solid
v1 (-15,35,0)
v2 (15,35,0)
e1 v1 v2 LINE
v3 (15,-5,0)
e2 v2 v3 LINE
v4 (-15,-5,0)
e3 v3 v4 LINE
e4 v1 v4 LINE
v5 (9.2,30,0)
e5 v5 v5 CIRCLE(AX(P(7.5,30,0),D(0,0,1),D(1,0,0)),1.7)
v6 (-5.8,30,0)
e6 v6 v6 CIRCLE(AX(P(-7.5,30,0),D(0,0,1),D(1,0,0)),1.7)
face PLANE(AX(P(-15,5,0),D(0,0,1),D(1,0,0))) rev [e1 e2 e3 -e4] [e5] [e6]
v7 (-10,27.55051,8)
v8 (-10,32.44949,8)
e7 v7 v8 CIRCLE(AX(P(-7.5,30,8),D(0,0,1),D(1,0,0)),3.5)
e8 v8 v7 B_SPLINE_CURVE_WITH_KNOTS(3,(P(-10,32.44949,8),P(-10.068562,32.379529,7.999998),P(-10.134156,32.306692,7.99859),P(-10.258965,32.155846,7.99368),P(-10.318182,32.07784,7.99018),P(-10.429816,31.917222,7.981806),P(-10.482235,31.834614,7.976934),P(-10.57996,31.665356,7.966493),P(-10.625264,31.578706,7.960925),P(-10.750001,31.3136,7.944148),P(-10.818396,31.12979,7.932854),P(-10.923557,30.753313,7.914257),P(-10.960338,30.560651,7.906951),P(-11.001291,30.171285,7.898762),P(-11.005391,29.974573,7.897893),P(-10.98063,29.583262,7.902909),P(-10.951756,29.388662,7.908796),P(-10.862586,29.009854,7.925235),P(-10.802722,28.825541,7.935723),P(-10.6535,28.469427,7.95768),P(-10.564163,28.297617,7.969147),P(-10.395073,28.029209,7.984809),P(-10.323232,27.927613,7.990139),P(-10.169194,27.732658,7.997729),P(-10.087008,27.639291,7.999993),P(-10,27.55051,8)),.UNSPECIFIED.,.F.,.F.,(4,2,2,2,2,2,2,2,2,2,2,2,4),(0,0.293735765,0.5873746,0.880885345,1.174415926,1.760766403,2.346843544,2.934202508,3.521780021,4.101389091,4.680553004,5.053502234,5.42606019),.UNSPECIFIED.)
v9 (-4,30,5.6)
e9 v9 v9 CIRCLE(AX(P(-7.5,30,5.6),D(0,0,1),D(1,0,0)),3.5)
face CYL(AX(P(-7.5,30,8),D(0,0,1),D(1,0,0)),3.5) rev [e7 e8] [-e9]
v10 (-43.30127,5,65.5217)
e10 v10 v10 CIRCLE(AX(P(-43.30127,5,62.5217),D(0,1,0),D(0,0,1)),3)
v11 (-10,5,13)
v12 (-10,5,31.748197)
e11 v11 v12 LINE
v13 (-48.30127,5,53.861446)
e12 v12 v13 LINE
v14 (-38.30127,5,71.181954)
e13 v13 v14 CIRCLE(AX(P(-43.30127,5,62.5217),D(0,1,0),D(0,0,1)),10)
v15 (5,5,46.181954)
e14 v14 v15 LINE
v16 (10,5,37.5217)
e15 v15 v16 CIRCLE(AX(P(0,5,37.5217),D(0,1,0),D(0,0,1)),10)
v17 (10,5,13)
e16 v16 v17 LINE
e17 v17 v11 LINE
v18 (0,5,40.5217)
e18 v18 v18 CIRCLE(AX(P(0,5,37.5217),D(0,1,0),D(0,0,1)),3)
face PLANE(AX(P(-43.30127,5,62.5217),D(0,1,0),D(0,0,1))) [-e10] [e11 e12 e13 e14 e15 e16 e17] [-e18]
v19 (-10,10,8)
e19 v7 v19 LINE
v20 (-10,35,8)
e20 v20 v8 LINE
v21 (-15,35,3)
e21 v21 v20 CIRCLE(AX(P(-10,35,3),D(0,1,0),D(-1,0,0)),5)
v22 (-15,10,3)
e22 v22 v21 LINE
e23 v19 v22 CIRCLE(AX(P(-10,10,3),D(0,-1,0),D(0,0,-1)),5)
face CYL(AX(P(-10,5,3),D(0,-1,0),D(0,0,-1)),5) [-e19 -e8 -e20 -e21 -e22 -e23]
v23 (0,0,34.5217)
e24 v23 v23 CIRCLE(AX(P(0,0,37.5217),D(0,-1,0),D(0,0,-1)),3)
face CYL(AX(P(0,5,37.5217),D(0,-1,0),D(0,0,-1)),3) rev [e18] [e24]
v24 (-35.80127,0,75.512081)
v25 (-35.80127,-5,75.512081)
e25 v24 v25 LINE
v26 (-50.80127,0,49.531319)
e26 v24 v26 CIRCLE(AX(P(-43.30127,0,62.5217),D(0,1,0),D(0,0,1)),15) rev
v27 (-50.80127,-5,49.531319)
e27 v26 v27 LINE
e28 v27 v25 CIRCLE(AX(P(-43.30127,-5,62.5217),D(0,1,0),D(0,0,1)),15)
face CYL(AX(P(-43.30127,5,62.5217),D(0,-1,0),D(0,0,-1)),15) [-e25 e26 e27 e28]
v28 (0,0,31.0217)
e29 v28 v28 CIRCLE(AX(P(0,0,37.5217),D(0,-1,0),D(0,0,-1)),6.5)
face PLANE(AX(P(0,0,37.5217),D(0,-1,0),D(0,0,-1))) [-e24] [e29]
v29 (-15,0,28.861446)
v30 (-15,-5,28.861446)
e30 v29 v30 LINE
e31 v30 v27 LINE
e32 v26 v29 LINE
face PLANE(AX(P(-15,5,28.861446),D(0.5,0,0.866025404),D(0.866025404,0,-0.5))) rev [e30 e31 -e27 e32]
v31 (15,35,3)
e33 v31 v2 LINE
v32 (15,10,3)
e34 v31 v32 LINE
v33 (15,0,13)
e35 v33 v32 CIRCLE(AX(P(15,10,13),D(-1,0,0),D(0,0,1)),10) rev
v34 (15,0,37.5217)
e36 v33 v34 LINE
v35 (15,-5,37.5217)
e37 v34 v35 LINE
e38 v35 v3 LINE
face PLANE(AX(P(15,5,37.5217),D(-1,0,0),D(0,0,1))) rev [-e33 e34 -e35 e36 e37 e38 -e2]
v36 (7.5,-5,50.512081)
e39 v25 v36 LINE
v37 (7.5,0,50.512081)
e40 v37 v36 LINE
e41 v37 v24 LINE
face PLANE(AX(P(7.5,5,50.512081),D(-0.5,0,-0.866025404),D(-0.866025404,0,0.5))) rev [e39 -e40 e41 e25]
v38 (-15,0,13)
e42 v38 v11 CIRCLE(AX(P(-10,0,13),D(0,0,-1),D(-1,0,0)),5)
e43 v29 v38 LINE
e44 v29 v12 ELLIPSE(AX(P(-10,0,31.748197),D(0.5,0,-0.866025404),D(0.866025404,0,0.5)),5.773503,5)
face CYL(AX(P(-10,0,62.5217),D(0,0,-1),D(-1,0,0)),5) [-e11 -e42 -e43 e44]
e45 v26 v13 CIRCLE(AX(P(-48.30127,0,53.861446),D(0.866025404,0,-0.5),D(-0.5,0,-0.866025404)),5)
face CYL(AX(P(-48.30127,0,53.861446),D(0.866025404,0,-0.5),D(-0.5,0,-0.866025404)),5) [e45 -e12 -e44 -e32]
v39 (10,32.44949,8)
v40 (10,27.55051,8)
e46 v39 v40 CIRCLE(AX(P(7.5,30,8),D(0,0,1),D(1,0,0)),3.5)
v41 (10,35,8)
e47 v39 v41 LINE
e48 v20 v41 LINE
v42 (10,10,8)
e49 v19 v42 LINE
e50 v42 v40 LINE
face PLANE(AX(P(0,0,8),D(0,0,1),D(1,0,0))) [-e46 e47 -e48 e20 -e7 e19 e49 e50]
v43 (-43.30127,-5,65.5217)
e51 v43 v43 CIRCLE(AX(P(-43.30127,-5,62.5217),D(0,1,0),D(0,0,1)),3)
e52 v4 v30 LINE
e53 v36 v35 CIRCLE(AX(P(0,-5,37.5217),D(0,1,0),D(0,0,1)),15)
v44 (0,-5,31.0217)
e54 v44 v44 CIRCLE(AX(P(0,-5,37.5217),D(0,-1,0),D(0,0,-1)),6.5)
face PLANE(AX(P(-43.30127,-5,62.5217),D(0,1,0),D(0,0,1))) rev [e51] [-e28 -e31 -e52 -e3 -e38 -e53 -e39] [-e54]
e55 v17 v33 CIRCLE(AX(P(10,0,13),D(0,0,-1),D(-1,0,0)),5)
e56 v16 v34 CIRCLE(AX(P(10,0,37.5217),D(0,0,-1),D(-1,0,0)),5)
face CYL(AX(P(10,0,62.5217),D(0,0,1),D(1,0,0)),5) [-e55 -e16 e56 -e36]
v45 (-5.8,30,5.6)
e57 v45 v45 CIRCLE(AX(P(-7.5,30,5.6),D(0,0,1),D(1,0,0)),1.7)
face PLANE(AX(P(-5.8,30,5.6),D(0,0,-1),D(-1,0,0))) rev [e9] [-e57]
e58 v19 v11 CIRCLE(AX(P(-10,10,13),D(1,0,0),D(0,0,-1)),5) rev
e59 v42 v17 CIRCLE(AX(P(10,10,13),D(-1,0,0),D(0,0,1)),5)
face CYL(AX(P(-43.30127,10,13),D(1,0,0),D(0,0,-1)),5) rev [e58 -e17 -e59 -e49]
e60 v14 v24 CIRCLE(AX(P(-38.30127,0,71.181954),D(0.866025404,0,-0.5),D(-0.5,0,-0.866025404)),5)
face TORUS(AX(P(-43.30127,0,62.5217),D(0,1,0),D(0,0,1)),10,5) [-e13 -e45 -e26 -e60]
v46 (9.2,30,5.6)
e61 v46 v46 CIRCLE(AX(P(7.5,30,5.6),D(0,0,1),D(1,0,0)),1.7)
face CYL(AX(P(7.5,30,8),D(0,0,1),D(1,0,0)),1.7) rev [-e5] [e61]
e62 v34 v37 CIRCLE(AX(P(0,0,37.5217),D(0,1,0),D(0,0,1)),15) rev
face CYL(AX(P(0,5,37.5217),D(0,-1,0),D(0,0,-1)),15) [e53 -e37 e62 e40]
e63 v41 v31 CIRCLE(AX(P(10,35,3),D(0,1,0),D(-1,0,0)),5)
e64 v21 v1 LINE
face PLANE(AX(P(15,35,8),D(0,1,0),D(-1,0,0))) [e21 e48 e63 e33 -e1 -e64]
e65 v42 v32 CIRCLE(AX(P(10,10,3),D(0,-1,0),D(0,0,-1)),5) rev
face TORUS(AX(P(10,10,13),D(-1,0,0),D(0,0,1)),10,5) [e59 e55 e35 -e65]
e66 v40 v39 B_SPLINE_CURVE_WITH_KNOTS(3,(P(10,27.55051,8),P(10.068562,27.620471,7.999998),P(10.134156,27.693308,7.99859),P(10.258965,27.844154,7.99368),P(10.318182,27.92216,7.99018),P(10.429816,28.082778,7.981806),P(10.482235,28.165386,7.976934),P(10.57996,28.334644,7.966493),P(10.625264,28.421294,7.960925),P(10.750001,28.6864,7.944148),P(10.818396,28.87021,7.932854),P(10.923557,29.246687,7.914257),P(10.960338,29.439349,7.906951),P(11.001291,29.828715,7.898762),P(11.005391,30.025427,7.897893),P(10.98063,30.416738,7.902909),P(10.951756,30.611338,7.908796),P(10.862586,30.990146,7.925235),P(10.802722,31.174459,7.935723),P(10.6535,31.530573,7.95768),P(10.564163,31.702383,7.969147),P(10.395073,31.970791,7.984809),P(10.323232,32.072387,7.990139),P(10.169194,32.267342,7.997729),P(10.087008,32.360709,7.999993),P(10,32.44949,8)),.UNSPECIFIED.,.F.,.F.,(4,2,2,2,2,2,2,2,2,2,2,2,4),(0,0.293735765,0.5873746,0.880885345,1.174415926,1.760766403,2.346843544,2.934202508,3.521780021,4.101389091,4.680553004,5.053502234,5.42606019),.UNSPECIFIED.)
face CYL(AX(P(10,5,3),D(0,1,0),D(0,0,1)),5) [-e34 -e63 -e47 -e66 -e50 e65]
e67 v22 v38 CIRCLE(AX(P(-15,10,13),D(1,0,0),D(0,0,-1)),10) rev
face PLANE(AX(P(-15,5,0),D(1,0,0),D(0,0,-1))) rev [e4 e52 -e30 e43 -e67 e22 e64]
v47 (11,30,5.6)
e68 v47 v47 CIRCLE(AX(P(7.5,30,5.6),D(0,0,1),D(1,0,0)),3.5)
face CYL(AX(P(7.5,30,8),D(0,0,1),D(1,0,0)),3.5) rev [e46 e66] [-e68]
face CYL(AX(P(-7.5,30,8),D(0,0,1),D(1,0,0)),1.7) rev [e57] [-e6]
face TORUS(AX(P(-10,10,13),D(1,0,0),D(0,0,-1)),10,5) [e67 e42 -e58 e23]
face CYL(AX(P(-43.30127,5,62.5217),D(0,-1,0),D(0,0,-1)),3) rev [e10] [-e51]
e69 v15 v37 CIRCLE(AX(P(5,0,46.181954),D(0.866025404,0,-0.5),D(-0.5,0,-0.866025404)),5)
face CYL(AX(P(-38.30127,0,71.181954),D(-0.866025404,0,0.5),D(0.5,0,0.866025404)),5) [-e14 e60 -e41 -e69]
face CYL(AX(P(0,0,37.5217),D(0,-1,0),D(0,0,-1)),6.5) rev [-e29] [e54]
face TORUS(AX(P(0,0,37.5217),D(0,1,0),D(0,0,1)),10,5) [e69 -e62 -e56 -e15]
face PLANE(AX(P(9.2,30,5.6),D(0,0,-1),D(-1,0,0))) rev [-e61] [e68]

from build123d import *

# Parameters (mm, degrees)
CROQUIS1_R                                           = 3
SALIENTE_EXTRUIR1_DEPTH                              = 5
CROQUIS2_W                                           = 30
CROQUIS2_H                                           = 30
SALIENTE_EXTRUIR2_DEPTH                              = 8
REFRENTADO_PARA_TORNILLO_CON_CABEZA_TRON_D           = 3.4
REFRENTADO_PARA_TORNILLO_CON_CABEZA_TRON_CBORE_D     = 7
REFRENTADO_PARA_TORNILLO_CON_CABEZA_TRON_CBORE_DEPTH = 2.4
CROQUIS11_R                                          = 6.5
CORTAR_EXTRUIR3_DEPTH                                = 5
REDONDEO8_R                                          = 5


with BuildPart() as part:
    # Croquis1 → Saliente-Extruir1 (new, symmetric)
    with BuildSketch(Plane(origin=(0, 0, 0), x_dir=(-1, 0, 0), z_dir=(0, 1, 0))):
        with BuildLine():
            Line((15, 0), (-15, 0))
            Line((-15, 0), (-15, 37.5217))
            ThreePointArc((-15, 37.5217), (-12.990381057, 45.0217), (-7.5, 50.512081057))
            Line((-7.5, 50.512081057), (35.801270189, 75.512081057))
            ThreePointArc((35.801270189, 75.512081057), (56.291651246, 70.0217), (50.801270189, 49.531318943))
            Line((50.801270189, 49.531318943), (15, 28.861445962))
            Line((15, 28.861445962), (15, 0))
        make_face()
        with Locations(Location((0, 37.5217, 0), (0, 0, 90))):
            Circle(CROQUIS1_R, mode=Mode.SUBTRACT)
        with Locations(Location((43.301270189, 62.5217, 0), (0, 0, 90))):
            Circle(CROQUIS1_R, mode=Mode.SUBTRACT)
    extrude(amount=SALIENTE_EXTRUIR1_DEPTH, both=True)

    # Croquis2 → Saliente-Extruir2 (add)
    with BuildSketch(Plane(origin=(0, 0, 0), x_dir=(1, 0, 0), z_dir=(0, 0, -1))):
        with Locations((0, -20)):
            Rectangle(CROQUIS2_W, CROQUIS2_H)
    extrude(amount=-SALIENTE_EXTRUIR2_DEPTH)

    # Refrentado para tornillo con cabeza troncocónica de M31 (through all)
    with Locations(Plane.XY.offset(8)):
        with Locations((-7.5, 30), (7.5, 30)):
            CounterBoreHole(REFRENTADO_PARA_TORNILLO_CON_CABEZA_TRON_D / 2, REFRENTADO_PARA_TORNILLO_CON_CABEZA_TRON_CBORE_D / 2, REFRENTADO_PARA_TORNILLO_CON_CABEZA_TRON_CBORE_DEPTH)

    # Croquis11 → Cortar-Extruir3 (cut)
    with BuildSketch(Plane.XZ.offset(5)):
        with Locations(Location((0, 37.5217, 0), (0, 0, 270))):
            Circle(CROQUIS11_R)
    extrude(amount=-CORTAR_EXTRUIR3_DEPTH, mode=Mode.SUBTRACT)

    # Redondeo8
    # the kernel refuses this fillet: 5 mm, written as the material it adds along each edge
    with BuildSketch(Plane(origin=(15, 5, 8), x_dir=(0, 0, 1), z_dir=(-1, 0, 0))) as redondeo8_piece_1:
        with BuildLine():
            CenterArc((REDONDEO8_R, REDONDEO8_R), REDONDEO8_R, 180, 90)
            Line((0, REDONDEO8_R), (0, 0))
            Line((0, 0), (REDONDEO8_R, 0))
        make_face()
    extrude(amount=30)
    # the kernel refuses this fillet: 5 mm, written as the material it takes off along each edge
    with BuildSketch(Plane(origin=(-50.801270189, 5, 49.531318943), x_dir=(0.4999999999999951, 0, 0.8660254037844415), z_dir=(0.8660254037844415, 0, -0.49999999999999517))) as redondeo8_2_piece_1_section:
        with BuildLine():
            CenterArc((REDONDEO8_R, REDONDEO8_R), REDONDEO8_R, 180, 90)
            Line((0, REDONDEO8_R), (0, 0))
            Line((0, 0), (REDONDEO8_R, 0))
        make_face()
    redondeo8_2_piece_1 = extrude(amount=53.839745962, mode=Mode.PRIVATE)
    redondeo8_2_piece_1 = split(redondeo8_2_piece_1, bisect_by=Plane(origin=(-15, 3.85828394, 40.323429829), z_dir=(-1, 0, 0)), keep=Keep.TOP, mode=Mode.PRIVATE)
    add(redondeo8_2_piece_1, mode=Mode.SUBTRACT)
    with BuildSketch(Plane(origin=(-43.301270189, 5, 62.5217), x_dir=(0.4999999999999953, 0, 0.8660254037844414), z_dir=(0.8660254037844414, 0, -0.4999999999999953))) as redondeo8_2_piece_2:
        with BuildLine():
            CenterArc((15 - REDONDEO8_R, REDONDEO8_R), REDONDEO8_R, 270, 90)
            Line((15, REDONDEO8_R), (15, 0))
            Line((15, 0), (15 - REDONDEO8_R, 0))
        make_face()
    revolve(axis=Axis((-43.301270189, 5, 62.5217), (0, -1, 0)), revolution_arc=180, mode=Mode.SUBTRACT)
    with BuildSketch(Plane(origin=(7.5, 5, 50.512081057), x_dir=(0, -1, 0), z_dir=(-0.8660254037844416, 0, 0.499999999999995))) as redondeo8_2_piece_3:
        with BuildLine():
            CenterArc((REDONDEO8_R, -REDONDEO8_R), REDONDEO8_R, 90, 90)
            Line((0, -REDONDEO8_R), (0, 0))
            Line((0, 0), (REDONDEO8_R, 0))
        make_face()
    extrude(amount=50, mode=Mode.SUBTRACT)
    with BuildSketch(Plane(origin=(0, 5, 37.5217), x_dir=(1, 0, 0), z_dir=(0, 0, -1))) as redondeo8_2_piece_4:
        with BuildLine():
            CenterArc((15 - REDONDEO8_R, REDONDEO8_R), REDONDEO8_R, 270, 90)
            Line((15 - REDONDEO8_R, 0), (15, 0))
            Line((15, 0), (15, REDONDEO8_R))
        make_face()
    revolve(axis=Axis((0, 5, 37.5217), (0, -1, 0)), revolution_arc=60, mode=Mode.SUBTRACT)
    with BuildSketch(Plane(origin=(-15, 5, 41.361445962), x_dir=(1, 0, 0), z_dir=(0, 0, -1))) as redondeo8_2_piece_5_section:
        with BuildLine():
            CenterArc((REDONDEO8_R, REDONDEO8_R), REDONDEO8_R, 180, 90)
            Line((0, REDONDEO8_R), (0, 0))
            Line((0, 0), (REDONDEO8_R, 0))
        make_face()
    redondeo8_2_piece_5 = extrude(amount=28.361445962, mode=Mode.PRIVATE)
    redondeo8_2_piece_5 = split(redondeo8_2_piece_5, bisect_by=Plane(origin=(-10.61401453, 3.841965375, 26.329196071), z_dir=(-0.49999999999999517, 0, -0.8660254037844415)), keep=Keep.TOP, mode=Mode.PRIVATE)
    add(redondeo8_2_piece_5, mode=Mode.SUBTRACT)
    with BuildSketch(Plane(origin=(15, 47.5, 8), x_dir=(0, 0, -1), z_dir=(0, -1, 0))) as redondeo8_2_piece_6:
        with BuildLine():
            CenterArc((REDONDEO8_R, -REDONDEO8_R), REDONDEO8_R, 90, 90)
            Line((0, -REDONDEO8_R), (0, 0))
            Line((0, 0), (REDONDEO8_R, 0))
        make_face()
    extrude(amount=37.5, mode=Mode.SUBTRACT)
    with BuildSketch(Plane(origin=(-15, 10, 8), x_dir=(1, 0, 0), z_dir=(0, 1, 0))) as redondeo8_2_piece_7:
        with BuildLine():
            CenterArc((REDONDEO8_R, REDONDEO8_R), REDONDEO8_R, 180, 90)
            Line((0, REDONDEO8_R), (0, 0))
            Line((0, 0), (REDONDEO8_R, 0))
        make_face()
    extrude(amount=37.5, mode=Mode.SUBTRACT)
    with BuildSketch(Plane(origin=(15, 5, 13), x_dir=(0, -1, 0), z_dir=(0, 0, 1))) as redondeo8_2_piece_8:
        with BuildLine():
            CenterArc((REDONDEO8_R, -REDONDEO8_R), REDONDEO8_R, 90, 90)
            Line((0, -REDONDEO8_R), (0, 0))
            Line((0, 0), (REDONDEO8_R, 0))
        make_face()
    extrude(amount=24.5217, mode=Mode.SUBTRACT)
    with BuildSketch(Plane(origin=(15, 10, 13), x_dir=(0, -1, 0), z_dir=(0, 0, 1))) as redondeo8_2_piece_9:
        with BuildLine():
            CenterArc((5 + REDONDEO8_R, -REDONDEO8_R), REDONDEO8_R, 90, 90)
            Line((5, -REDONDEO8_R), (5, 0))
            Line((5, 0), (5 + REDONDEO8_R, 0))
        make_face()
    revolve(axis=Axis((15, 10, 13), (1, 0, 0)), revolution_arc=90, mode=Mode.SUBTRACT)
    with BuildSketch(Plane(origin=(-15, 10, 13), x_dir=(0, -1, 0), z_dir=(0, 0, 1))) as redondeo8_2_piece_10:
        with BuildLine():
            CenterArc((5 + REDONDEO8_R, REDONDEO8_R), REDONDEO8_R, 180, 90)
            Line((5, REDONDEO8_R), (5, 0))
            Line((5, 0), (5 + REDONDEO8_R, 0))
        make_face()
    revolve(axis=Axis((-15, 10, 13), (1, 0, 0)), revolution_arc=90, mode=Mode.SUBTRACT)
    with BuildSketch(Plane(origin=(-15, 5, 41.361445962), x_dir=(1, 0, 0), z_dir=(0, 0, -1))) as redondeo8_2_piece_11a_section:
        with BuildLine():
            CenterArc((REDONDEO8_R, REDONDEO8_R), REDONDEO8_R, 180, 90)
            Line((0, REDONDEO8_R), (0, 0))
            Line((0, 0), (REDONDEO8_R, 0))
        make_face()
    redondeo8_2_piece_11a = extrude(amount=28.361445962, mode=Mode.PRIVATE)
    redondeo8_2_piece_11a = split(redondeo8_2_piece_11a, bisect_by=Plane(origin=(-16.671225656, 3.89815345, 29.826328544), z_dir=(0.49999999999999517, 0, 0.8660254037844415)), keep=Keep.TOP, mode=Mode.PRIVATE)
    with BuildSketch(Plane(origin=(-50.801270189, 5, 49.531318943), x_dir=(0.4999999999999951, 0, 0.8660254037844415), z_dir=(0.8660254037844415, 0, -0.49999999999999517))) as redondeo8_2_piece_11b_section:
        with BuildLine():
            CenterArc((REDONDEO8_R, REDONDEO8_R), REDONDEO8_R, 180, 90)
            Line((0, REDONDEO8_R), (0, 0))
            Line((0, 0), (REDONDEO8_R, 0))
        make_face()
    redondeo8_2_piece_11b = extrude(amount=53.839745962, mode=Mode.PRIVATE)
    redondeo8_2_piece_11b = split(redondeo8_2_piece_11b, bisect_by=Plane(origin=(-15, 3.89815345, 26.931680798), z_dir=(1, 0, 0)), keep=Keep.TOP, mode=Mode.PRIVATE)
    redondeo8_2_piece_11 = redondeo8_2_piece_11a & redondeo8_2_piece_11b
    add(redondeo8_2_piece_11, mode=Mode.SUBTRACT)


solid = part.part
